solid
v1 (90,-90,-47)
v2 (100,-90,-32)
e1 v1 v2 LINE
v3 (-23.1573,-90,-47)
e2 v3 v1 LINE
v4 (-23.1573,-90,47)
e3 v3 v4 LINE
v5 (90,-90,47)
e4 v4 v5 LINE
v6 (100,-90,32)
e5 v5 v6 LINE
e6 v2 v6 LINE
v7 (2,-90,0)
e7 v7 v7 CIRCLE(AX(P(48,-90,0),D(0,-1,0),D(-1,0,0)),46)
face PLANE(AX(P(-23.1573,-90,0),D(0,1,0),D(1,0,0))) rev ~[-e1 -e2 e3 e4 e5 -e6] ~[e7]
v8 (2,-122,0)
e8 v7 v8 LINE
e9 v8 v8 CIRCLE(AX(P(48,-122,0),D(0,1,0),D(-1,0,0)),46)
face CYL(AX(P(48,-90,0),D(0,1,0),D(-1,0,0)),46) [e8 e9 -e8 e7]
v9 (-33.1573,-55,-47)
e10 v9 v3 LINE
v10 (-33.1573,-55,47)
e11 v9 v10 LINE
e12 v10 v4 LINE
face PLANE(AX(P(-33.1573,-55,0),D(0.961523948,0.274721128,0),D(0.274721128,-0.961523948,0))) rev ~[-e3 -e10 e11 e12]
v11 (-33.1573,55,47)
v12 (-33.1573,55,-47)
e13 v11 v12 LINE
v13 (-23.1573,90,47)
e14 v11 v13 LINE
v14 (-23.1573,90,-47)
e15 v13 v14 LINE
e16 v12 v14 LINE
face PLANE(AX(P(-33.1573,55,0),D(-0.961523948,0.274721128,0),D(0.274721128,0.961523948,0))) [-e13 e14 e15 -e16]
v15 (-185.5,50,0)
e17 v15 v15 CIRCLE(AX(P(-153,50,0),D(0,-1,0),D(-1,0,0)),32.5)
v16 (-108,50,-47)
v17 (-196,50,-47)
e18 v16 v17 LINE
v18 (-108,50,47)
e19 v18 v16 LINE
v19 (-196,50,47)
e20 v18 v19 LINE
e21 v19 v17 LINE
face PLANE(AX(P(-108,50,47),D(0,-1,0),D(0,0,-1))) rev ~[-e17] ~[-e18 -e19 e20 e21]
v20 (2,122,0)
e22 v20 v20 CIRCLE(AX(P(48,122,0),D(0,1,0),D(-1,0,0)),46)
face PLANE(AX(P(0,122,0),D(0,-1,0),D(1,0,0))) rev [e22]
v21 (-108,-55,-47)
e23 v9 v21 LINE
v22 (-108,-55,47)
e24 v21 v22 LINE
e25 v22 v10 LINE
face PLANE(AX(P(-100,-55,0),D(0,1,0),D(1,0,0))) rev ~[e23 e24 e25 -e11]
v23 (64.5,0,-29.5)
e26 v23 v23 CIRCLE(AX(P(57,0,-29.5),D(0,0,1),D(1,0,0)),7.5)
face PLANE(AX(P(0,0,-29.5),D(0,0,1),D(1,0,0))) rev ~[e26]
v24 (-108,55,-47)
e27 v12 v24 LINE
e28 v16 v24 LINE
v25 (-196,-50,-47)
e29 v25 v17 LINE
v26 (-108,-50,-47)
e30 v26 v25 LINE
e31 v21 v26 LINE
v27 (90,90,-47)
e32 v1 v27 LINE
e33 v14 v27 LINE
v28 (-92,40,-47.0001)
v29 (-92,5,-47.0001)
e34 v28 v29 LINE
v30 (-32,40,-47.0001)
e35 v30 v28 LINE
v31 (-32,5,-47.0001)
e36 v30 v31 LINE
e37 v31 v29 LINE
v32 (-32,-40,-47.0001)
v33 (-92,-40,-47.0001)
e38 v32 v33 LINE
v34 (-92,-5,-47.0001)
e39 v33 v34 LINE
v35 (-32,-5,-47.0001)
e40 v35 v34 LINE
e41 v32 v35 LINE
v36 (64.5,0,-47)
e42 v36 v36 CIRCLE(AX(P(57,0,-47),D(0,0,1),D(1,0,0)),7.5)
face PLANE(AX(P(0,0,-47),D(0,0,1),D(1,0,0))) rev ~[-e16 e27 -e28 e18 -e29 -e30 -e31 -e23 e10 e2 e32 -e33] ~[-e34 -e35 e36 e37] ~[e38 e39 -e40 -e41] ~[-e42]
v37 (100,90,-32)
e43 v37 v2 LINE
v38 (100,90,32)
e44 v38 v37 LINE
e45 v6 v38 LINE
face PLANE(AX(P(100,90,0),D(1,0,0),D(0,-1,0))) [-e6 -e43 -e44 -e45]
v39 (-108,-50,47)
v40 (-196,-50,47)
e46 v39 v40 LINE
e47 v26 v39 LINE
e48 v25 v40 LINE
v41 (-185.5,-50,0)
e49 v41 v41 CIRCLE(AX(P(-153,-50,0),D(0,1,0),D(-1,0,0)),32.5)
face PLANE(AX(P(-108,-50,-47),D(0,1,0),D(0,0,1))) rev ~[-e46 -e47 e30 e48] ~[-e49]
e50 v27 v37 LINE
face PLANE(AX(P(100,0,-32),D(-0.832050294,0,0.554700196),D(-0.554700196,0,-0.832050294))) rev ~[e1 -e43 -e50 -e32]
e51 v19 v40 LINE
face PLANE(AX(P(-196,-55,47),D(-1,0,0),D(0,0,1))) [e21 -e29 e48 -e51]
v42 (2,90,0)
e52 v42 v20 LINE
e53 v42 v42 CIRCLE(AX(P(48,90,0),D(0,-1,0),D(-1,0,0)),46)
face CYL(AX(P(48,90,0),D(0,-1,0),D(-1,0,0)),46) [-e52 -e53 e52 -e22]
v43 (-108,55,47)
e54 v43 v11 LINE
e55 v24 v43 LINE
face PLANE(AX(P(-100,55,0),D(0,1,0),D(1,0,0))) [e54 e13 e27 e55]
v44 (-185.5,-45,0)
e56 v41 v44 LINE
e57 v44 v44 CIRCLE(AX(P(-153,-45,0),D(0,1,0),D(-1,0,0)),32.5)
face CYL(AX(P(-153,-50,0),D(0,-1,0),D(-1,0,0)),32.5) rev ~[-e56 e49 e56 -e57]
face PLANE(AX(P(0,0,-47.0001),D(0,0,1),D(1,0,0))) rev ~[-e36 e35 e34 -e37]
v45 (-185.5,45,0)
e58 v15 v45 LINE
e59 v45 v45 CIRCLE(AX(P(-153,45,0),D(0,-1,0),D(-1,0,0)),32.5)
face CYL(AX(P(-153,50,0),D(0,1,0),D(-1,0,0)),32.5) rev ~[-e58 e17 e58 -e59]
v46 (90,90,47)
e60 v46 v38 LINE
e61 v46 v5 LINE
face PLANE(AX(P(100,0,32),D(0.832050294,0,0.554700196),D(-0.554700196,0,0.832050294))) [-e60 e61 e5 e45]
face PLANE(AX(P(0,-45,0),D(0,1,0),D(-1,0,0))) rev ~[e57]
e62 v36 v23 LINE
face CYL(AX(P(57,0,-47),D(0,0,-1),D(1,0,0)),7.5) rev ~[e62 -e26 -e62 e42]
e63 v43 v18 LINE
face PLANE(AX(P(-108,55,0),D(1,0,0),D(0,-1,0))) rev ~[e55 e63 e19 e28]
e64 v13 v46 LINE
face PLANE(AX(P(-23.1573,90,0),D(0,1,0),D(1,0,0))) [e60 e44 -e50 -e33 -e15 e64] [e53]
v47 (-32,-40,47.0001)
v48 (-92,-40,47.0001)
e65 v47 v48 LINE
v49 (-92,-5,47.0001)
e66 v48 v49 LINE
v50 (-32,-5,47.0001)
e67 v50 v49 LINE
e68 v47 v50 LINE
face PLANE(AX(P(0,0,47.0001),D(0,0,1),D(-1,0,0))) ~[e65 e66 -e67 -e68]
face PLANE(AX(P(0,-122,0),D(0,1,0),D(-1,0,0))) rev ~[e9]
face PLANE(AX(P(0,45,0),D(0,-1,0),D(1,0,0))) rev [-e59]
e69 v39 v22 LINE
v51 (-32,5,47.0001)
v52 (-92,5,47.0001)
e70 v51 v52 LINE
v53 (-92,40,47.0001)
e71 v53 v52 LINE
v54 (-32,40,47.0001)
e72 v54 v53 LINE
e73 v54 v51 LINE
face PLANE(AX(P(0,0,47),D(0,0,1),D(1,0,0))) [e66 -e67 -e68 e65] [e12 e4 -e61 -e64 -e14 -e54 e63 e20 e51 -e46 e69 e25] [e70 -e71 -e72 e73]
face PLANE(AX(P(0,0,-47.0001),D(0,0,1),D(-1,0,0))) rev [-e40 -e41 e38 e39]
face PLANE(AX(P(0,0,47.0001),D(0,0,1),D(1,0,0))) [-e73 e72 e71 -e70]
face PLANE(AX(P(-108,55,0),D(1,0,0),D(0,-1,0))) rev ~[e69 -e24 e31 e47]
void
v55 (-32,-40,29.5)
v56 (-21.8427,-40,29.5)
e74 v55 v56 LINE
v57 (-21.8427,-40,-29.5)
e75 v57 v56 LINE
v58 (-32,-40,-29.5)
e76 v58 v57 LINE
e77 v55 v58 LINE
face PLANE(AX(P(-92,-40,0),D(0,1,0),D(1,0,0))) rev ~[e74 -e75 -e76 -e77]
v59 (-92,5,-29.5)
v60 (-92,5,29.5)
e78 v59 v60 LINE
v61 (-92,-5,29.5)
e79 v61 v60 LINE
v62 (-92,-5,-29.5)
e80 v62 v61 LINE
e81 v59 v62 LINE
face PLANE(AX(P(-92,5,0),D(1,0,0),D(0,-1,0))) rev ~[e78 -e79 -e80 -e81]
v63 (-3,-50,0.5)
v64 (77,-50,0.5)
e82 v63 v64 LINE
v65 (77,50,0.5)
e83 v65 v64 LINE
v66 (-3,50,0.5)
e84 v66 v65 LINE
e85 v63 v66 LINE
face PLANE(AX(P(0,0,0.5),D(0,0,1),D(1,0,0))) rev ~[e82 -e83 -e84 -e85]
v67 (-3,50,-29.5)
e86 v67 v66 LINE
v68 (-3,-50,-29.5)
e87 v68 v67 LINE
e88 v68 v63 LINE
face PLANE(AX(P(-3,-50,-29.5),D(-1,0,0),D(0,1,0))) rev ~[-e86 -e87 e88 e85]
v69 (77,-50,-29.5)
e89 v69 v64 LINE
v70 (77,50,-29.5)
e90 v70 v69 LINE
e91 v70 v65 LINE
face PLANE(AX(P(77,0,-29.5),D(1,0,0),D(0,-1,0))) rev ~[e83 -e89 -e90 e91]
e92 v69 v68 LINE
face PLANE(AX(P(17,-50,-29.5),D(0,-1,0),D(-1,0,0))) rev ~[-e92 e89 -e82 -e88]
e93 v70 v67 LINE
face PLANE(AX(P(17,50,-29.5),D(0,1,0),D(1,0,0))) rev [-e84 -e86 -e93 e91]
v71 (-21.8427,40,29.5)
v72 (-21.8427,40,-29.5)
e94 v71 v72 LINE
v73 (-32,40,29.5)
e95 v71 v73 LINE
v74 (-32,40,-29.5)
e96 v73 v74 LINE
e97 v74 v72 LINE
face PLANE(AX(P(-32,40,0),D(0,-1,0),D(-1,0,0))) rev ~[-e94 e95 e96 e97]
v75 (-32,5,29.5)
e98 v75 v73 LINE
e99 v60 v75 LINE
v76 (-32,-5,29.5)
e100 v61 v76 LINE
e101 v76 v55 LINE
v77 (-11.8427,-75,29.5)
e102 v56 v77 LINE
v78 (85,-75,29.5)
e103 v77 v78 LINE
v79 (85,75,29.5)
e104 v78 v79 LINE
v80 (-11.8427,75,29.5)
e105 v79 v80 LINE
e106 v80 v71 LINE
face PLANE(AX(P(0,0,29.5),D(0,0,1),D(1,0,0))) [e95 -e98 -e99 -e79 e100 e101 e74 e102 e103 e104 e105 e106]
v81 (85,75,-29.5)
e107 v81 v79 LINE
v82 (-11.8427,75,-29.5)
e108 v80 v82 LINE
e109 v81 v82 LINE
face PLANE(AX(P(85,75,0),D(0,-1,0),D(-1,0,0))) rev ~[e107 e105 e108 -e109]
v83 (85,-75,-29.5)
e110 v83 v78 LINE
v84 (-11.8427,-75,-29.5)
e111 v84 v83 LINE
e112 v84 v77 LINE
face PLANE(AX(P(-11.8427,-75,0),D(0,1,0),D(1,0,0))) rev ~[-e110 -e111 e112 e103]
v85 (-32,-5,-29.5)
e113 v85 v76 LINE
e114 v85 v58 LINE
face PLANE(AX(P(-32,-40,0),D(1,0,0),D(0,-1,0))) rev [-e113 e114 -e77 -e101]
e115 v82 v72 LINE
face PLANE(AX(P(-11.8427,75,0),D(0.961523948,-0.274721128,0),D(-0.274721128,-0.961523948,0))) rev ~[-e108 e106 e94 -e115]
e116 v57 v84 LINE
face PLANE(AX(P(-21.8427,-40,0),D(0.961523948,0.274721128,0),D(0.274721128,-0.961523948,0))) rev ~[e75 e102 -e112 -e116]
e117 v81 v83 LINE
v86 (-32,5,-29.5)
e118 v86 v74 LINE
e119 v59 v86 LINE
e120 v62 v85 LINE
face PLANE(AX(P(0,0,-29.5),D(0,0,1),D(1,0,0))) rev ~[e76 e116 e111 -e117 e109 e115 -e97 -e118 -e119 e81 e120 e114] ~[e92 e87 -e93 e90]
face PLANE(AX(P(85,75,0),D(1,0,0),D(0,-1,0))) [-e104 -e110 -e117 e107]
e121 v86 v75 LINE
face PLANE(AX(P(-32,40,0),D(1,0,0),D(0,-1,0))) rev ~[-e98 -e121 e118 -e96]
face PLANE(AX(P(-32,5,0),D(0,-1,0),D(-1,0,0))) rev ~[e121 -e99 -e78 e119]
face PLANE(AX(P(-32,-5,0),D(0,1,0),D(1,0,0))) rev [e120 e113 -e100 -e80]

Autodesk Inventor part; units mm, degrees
ref_plane "YZ Plane" through (0, 0, 0) normal (1, 0, 0) x (0, 1, 0)
ref_plane "XZ Plane" through (0, 0, 0) normal (0, 1, 0) x (-1, 0, 0)
sketch "Sketch1" plane through (0, 0, 0) normal (0, 0, 1) x (1, 0, 0)
  line L0 (-100, 0) -> (100, 0) construction
  line L1 (-100, 55) -> (-100, -55)
  circle A0 centre (-57.5, 47.5) radius 2.25
  line L2 (100, -70) -> (100, 70) construction
  line L3 (-92, 0) -> (-92, 47.5) construction
  line L4 (-92, 0) -> (-92, -47.5) construction
  circle A1 centre (-92.5, 47.5) radius 2.25
  circle A2 centre (-92.5, 47.5) radius 1.25
  circle A3 centre (-57.5, 47.5) radius 1.25
  line L5 (-100, 55) -> (-33.1573, 55)
  line L6 (-33.1573, 55) -> (-23.1573, 90)
  line L7 (-23.1573, 90) -> (100, 90)
  line L8 (100, 90) -> (100, 0)
  line L9 (100, -90) -> (100, 0)
  line L10 (-23.1573, -90) -> (100, -90)
  line L11 (-33.1573, -55) -> (-23.1573, -90)
  line L12 (-100, -55) -> (-33.1573, -55)
  line L13 (85, 75) -> (-11.8427, 75)
  line L14 (-11.8427, 75) -> (-21.8427, 40)
  line L15 (-21.8427, 40) -> (-92, 40)
  line L16 (-92, -40) -> (-21.8427, -40)
  line L17 (-21.8427, -40) -> (-11.8427, -75)
  line L18 (-11.8427, -75) -> (85, -75)
  line L19 (92.5, 82.5) -> (-17.5, 82.5) construction
  line L20 (-17.5, 82.5) -> (-27.5, 47.5) construction
  line L21 (-27.5, 47.5) -> (-92.5, 47.5) construction
  line L22 (-92.5, 47.5) -> (-92.5, -47.5) construction
  line L23 (-92.5, -47.5) -> (-27.5, -47.5) construction
  line L24 (-27.5, -47.5) -> (-17.5, -82.5) construction
  line L25 (-17.5, -82.5) -> (92.5, -82.5) construction
  line L26 (92.5, -82.5) -> (92.5, 0) construction
  line L27 (92.5, 0) -> (92.5, 82.5) construction
  line L28 (85, 75) -> (85, -75)
  line L29 (-100, 55) -> (-108, 55)
  line L30 (-108, 55) -> (-108, -55)
  line L31 (-108, -55) -> (-100, -55)
  line L32 (-100, -55) -> (-100, 55)
  line L33 (100, 0) -> (-108, 0)
  circle A4 centre (20, 82.5) radius 1.25
  circle A5 centre (20, 82.5) radius 2.25
  circle A6 centre (80, 82.5) radius 1.25
  circle A7 centre (80, 82.5) radius 2.25
  line L34 (50, 90) -> (50, 75) construction
  circle A8 centre (-22.5, 65) radius 1.25
  circle A9 centre (-22.5, 65) radius 2.25
  line L35 (-92, 40) -> (-92, -40)
  circle A10 centre (-96, 0) radius 2.25
  circle A11 centre (-96, 0) radius 1.25
  circle A12 centre (-104, 30) radius 2.25
  circle A13 centre (-104, 30) radius 1.25
  circle A14 centre (-104, -30) radius 2.25
  circle A15 centre (-104, -30) radius 1.25
  line L36 (-104, 55) -> (-104, -55) construction
  line L37 (-32, 40) -> (-32, 5)
  line L38 (-32, 5) -> (-92, 5)
  line L39 (77, 0) -> (77, -50)
  line L40 (77, -50) -> (-3, -50)
  line L41 (-3, -50) -> (-3, 0)
  line L42 (77, -40) -> (67, -40)
  line L43 (67, -40) -> (67, -50)
  line L44 (27, -50) -> (27, -40)
  line L45 (27, -40) -> (17, -40)
  line L46 (17, -40) -> (17, -50)
  circle A16 centre (57, 0) radius 7.5
  point P0 (0, 0)
  point P1 (0, 0)
  point P2 (77, 0)
  point P3 (-3, 0)
  dimension "d0" = 110
  dimension "d1" = 8
  dimension "d2" = 200
  dimension "d15" = 15
  dimension "d17" = 7.5
  dimension "d18" = 4.5
  dimension "d19" = 2.5
  dimension "d20" = 35
  dimension "d21" = 180
  dimension "d22" = 15
  dimension "d24" = 8
  dimension "d28" = 20
  dimension "d29" = 50
  dimension "d30" = 35
  dimension "d40" = 30
  dimension "d41" = 4
  dimension "d110" = 35
  dimension "d111" = 60
  dimension "d114" = 10
  dimension "d115" = 8
  dimension "d132" = 50
  dimension "d133" = 80
  dimension "d135" = 15
  dimension "d138" = 20
  dimension "d139" = 29
  dimension "d140" = 40
  dimension "d141" = 10
  dimension "d155" = 80
sketch "Sketch6" plane through (0, 0, 0) normal (0, 0, 1) x (1, 0, 0)
  line L0 (0, -140) -> (0, 140) construction
  line L1 (60, 0) -> (340, 0) construction
  line L2 (100, -70) -> (100, 70) construction
  line L3 (300, -100) -> (100, -70)
  line L4 (300, 100) -> (100, 70)
  dimension "d146" = 300
  dimension "d147" = 100
ref_plane "Work Plane2" through (300, 100, 0) normal (-0.9889364, -0.1483405, 0) x (0.1483405, -0.9889364, 0)
sketch "Sketch7" plane through (300, 100, 0) normal (-0.9889364, -0.1483405, 0) x (0.1483405, -0.9889364, 0)
  circle A0 centre (0, 0) radius 2.5
  dimension "d150" = 5
extrude "Extrusion1" add sketch "Sketch1" along normal mid plane 94 contours L5 L6 L7 L8 L33 L28 L13 L14 L15 L35 A10 L1 | L1 L33 L30 L29 | L33 A10 L35 L16 L17 L18 L28 L9 L10 L11 L12 L1 | L1 L31 L30 L33 | A10 L33 A11 | L33 A11 A10 | A11 L33 | L33 A11 | L35 L38 L37 L15 L14 L13 L28 L33 A16 | L33 L41 L40 L39 L28 L18 L17 L16 L35 | L33 A16 L39 L42 L43 L40 L44 L45 L46 L41 | L35 L15 L37 L38 | A16 L33 | L33 A16 | L46 L45 L44 L40 | L39 L40 L43 L42 | A0 | A1 | A2 | A3 | A4 | A5 | A6 | A7 | A8 | A9 | A12 | A13 | A14 | A15
extrude "Extrusion2" cut sketch "Sketch1" along normal mid plane 59 contours L35 L38 L37 L15 L14 L13 L28 L33 A16 | L33 L41 L40 L39 L28 L18 L17 L16 L35 | L33 A16 L39 L42 L43 L40 L44 L45 L46 L41 | L35 L15 L37 L38 | A16 L33 | L33 A16 | L46 L45 L44 L40 | L39 L40 L43 L42
sketch "Sketch2" plane through (-108, -55, 47) normal (-1, 0, 0) x (0, 0, 1)
  line L0 (0, -35) -> (0, 145) projected
  line L1 (-94, 5) -> (0, 5)
  line L2 (0, 5) -> (0, 105)
  line L3 (0, 105) -> (-94, 105)
  line L4 (-94, 105) -> (-94, 5)
  line L5 (-94, 5) -> (0, 105) construction
  line L6 (0, 5) -> (-94, 105) construction
  line L7 (-94, 32) -> (0, 32)
  line L8 (0, 32) -> (0, 78)
  line L9 (0, 78) -> (-94, 78)
  line L10 (-94, 78) -> (-94, 32)
  line L11 (-94, 32) -> (0, 78) construction
  line L12 (0, 32) -> (-94, 78) construction
  point P0 (-47, 55)
  dimension "d52" = 100
  dimension "d55" = 46
extrude "Extrusion3" add sketch "Sketch2" along normal blind 88
extrude "Extrusion4" [suppressed]
sketch "Sketch3" plane through (0, 0, 0) normal (0, 1, 0) x (-1, 0, 0)
  circle A0 centre (153, 0) radius 32.5
  line L0 (108, -47) -> (108, 47) projected
  line L1 (108, -47) -> (108, 47) projected
  line L2 (108, -47) -> (108, 47) construction
  line L3 (108, 0) -> (245.8238, 0) construction
  circle A1 centre (153, 0) radius 40
  line L4 (183.942, 9.942) -> (196, 22)
  line L5 (196, 22) -> (196, -22)
  line L6 (196, -22) -> (183.942, -9.942)
  line L7 (196, 47) -> (196, -47) projected
  line L8 (204, 47) -> (224, 20)
  line L9 (224, 20) -> (224, 47)
  line L10 (224, 47) -> (204, 47)
  line L11 (196, -47) -> (224, -47)
  line L12 (204, -47) -> (224, -20)
  line L13 (224, -20) -> (224, -47)
  line L14 (-100, 47) -> (23.1573, 47) projected
  line L15 (-100, 47) -> (-100, 32)
  line L16 (-100, 32) -> (-90, 47)
  line L17 (-100, -47) -> (23.1573, -47)
  line L18 (-100, -47) -> (-100, -32)
  line L19 (-100, -32) -> (-90, -47)
  circle A2 centre (-48, 0) radius 46
  line L20 (-100, -47) -> (-100, 47) projected
  circle A3 centre (-48, 0) radius 32.5
  line L21 (-4.8723, -16) -> (13.1277, -16)
  line L22 (13.1277, -16) -> (13.1277, 16)
  line L23 (13.1277, 16) -> (-4.8723, 16)
  point P0 (0, 0)
  point P1 (189.7631, 15.7631)
  point P2 (189.7631, -15.7631)
  dimension "d58" = 45
  dimension "d59" = 65
  dimension "d62" = 80
  dimension "d64" = 44
  dimension "d69" = 20
  dimension "d70" = 27
  dimension "d80" = 15
  dimension "d81" = 10
  dimension "d87" = 52
  dimension "d88" = 92
  dimension "d116" = 65
  dimension "d121" = 32
  dimension "d122" = 18
  dimension "d134" = 8
  dimension "d143" = 48
extrude "Extrusion15" cut sketch "Sketch3" along normal through all both and the other way through all contours L10 L9 L8 | L12 L13 L11 | L14 L16 L15 | L18 L19 L17
extrude "Extrusion16" add sketch "Sketch1" along normal through all both and the other way through all contours L35 L15 L37 L38
extrude "Extrusion14" add sketch "Sketch3" against normal blind 32 from surface at -90 contours A2 | A3
extrude "Extrusion17" [suppressed]
extrude "Extrusion18" cut sketch "Sketch3" along normal blind 5 from surface at -50 contours A0
extrude "Extrusion21" cut sketch "Sketch1" along normal up to surface (17.5 mm away) from surface at -47 contours A16 L33 | L33 A16
extrude "Extrusion22" add sketch "Sketch1" along normal blind 30 from surface at -29.5 contours L33 A16 L39 L42 L43 L40 L44 L45 L46 L41 | L33 A16 | L46 L45 L44 L40 | L39 L40 L43 L42 picked at (58.4928, -2.6557)
extrude "Extrusion24" [suppressed]
mirror "Mirror2" about plane through (0, 0, 0) normal (0, 1, 0) of "Extrusion14", "Extrusion16", "Extrusion18", "Extrusion22"
equation "\"d17\" = 0.5 * d15"
equation "\"d21\" = d47"
equation "\"d45\" = 124"
equation "\"d46\" = 12"
equation "\"d47\" = 180"
